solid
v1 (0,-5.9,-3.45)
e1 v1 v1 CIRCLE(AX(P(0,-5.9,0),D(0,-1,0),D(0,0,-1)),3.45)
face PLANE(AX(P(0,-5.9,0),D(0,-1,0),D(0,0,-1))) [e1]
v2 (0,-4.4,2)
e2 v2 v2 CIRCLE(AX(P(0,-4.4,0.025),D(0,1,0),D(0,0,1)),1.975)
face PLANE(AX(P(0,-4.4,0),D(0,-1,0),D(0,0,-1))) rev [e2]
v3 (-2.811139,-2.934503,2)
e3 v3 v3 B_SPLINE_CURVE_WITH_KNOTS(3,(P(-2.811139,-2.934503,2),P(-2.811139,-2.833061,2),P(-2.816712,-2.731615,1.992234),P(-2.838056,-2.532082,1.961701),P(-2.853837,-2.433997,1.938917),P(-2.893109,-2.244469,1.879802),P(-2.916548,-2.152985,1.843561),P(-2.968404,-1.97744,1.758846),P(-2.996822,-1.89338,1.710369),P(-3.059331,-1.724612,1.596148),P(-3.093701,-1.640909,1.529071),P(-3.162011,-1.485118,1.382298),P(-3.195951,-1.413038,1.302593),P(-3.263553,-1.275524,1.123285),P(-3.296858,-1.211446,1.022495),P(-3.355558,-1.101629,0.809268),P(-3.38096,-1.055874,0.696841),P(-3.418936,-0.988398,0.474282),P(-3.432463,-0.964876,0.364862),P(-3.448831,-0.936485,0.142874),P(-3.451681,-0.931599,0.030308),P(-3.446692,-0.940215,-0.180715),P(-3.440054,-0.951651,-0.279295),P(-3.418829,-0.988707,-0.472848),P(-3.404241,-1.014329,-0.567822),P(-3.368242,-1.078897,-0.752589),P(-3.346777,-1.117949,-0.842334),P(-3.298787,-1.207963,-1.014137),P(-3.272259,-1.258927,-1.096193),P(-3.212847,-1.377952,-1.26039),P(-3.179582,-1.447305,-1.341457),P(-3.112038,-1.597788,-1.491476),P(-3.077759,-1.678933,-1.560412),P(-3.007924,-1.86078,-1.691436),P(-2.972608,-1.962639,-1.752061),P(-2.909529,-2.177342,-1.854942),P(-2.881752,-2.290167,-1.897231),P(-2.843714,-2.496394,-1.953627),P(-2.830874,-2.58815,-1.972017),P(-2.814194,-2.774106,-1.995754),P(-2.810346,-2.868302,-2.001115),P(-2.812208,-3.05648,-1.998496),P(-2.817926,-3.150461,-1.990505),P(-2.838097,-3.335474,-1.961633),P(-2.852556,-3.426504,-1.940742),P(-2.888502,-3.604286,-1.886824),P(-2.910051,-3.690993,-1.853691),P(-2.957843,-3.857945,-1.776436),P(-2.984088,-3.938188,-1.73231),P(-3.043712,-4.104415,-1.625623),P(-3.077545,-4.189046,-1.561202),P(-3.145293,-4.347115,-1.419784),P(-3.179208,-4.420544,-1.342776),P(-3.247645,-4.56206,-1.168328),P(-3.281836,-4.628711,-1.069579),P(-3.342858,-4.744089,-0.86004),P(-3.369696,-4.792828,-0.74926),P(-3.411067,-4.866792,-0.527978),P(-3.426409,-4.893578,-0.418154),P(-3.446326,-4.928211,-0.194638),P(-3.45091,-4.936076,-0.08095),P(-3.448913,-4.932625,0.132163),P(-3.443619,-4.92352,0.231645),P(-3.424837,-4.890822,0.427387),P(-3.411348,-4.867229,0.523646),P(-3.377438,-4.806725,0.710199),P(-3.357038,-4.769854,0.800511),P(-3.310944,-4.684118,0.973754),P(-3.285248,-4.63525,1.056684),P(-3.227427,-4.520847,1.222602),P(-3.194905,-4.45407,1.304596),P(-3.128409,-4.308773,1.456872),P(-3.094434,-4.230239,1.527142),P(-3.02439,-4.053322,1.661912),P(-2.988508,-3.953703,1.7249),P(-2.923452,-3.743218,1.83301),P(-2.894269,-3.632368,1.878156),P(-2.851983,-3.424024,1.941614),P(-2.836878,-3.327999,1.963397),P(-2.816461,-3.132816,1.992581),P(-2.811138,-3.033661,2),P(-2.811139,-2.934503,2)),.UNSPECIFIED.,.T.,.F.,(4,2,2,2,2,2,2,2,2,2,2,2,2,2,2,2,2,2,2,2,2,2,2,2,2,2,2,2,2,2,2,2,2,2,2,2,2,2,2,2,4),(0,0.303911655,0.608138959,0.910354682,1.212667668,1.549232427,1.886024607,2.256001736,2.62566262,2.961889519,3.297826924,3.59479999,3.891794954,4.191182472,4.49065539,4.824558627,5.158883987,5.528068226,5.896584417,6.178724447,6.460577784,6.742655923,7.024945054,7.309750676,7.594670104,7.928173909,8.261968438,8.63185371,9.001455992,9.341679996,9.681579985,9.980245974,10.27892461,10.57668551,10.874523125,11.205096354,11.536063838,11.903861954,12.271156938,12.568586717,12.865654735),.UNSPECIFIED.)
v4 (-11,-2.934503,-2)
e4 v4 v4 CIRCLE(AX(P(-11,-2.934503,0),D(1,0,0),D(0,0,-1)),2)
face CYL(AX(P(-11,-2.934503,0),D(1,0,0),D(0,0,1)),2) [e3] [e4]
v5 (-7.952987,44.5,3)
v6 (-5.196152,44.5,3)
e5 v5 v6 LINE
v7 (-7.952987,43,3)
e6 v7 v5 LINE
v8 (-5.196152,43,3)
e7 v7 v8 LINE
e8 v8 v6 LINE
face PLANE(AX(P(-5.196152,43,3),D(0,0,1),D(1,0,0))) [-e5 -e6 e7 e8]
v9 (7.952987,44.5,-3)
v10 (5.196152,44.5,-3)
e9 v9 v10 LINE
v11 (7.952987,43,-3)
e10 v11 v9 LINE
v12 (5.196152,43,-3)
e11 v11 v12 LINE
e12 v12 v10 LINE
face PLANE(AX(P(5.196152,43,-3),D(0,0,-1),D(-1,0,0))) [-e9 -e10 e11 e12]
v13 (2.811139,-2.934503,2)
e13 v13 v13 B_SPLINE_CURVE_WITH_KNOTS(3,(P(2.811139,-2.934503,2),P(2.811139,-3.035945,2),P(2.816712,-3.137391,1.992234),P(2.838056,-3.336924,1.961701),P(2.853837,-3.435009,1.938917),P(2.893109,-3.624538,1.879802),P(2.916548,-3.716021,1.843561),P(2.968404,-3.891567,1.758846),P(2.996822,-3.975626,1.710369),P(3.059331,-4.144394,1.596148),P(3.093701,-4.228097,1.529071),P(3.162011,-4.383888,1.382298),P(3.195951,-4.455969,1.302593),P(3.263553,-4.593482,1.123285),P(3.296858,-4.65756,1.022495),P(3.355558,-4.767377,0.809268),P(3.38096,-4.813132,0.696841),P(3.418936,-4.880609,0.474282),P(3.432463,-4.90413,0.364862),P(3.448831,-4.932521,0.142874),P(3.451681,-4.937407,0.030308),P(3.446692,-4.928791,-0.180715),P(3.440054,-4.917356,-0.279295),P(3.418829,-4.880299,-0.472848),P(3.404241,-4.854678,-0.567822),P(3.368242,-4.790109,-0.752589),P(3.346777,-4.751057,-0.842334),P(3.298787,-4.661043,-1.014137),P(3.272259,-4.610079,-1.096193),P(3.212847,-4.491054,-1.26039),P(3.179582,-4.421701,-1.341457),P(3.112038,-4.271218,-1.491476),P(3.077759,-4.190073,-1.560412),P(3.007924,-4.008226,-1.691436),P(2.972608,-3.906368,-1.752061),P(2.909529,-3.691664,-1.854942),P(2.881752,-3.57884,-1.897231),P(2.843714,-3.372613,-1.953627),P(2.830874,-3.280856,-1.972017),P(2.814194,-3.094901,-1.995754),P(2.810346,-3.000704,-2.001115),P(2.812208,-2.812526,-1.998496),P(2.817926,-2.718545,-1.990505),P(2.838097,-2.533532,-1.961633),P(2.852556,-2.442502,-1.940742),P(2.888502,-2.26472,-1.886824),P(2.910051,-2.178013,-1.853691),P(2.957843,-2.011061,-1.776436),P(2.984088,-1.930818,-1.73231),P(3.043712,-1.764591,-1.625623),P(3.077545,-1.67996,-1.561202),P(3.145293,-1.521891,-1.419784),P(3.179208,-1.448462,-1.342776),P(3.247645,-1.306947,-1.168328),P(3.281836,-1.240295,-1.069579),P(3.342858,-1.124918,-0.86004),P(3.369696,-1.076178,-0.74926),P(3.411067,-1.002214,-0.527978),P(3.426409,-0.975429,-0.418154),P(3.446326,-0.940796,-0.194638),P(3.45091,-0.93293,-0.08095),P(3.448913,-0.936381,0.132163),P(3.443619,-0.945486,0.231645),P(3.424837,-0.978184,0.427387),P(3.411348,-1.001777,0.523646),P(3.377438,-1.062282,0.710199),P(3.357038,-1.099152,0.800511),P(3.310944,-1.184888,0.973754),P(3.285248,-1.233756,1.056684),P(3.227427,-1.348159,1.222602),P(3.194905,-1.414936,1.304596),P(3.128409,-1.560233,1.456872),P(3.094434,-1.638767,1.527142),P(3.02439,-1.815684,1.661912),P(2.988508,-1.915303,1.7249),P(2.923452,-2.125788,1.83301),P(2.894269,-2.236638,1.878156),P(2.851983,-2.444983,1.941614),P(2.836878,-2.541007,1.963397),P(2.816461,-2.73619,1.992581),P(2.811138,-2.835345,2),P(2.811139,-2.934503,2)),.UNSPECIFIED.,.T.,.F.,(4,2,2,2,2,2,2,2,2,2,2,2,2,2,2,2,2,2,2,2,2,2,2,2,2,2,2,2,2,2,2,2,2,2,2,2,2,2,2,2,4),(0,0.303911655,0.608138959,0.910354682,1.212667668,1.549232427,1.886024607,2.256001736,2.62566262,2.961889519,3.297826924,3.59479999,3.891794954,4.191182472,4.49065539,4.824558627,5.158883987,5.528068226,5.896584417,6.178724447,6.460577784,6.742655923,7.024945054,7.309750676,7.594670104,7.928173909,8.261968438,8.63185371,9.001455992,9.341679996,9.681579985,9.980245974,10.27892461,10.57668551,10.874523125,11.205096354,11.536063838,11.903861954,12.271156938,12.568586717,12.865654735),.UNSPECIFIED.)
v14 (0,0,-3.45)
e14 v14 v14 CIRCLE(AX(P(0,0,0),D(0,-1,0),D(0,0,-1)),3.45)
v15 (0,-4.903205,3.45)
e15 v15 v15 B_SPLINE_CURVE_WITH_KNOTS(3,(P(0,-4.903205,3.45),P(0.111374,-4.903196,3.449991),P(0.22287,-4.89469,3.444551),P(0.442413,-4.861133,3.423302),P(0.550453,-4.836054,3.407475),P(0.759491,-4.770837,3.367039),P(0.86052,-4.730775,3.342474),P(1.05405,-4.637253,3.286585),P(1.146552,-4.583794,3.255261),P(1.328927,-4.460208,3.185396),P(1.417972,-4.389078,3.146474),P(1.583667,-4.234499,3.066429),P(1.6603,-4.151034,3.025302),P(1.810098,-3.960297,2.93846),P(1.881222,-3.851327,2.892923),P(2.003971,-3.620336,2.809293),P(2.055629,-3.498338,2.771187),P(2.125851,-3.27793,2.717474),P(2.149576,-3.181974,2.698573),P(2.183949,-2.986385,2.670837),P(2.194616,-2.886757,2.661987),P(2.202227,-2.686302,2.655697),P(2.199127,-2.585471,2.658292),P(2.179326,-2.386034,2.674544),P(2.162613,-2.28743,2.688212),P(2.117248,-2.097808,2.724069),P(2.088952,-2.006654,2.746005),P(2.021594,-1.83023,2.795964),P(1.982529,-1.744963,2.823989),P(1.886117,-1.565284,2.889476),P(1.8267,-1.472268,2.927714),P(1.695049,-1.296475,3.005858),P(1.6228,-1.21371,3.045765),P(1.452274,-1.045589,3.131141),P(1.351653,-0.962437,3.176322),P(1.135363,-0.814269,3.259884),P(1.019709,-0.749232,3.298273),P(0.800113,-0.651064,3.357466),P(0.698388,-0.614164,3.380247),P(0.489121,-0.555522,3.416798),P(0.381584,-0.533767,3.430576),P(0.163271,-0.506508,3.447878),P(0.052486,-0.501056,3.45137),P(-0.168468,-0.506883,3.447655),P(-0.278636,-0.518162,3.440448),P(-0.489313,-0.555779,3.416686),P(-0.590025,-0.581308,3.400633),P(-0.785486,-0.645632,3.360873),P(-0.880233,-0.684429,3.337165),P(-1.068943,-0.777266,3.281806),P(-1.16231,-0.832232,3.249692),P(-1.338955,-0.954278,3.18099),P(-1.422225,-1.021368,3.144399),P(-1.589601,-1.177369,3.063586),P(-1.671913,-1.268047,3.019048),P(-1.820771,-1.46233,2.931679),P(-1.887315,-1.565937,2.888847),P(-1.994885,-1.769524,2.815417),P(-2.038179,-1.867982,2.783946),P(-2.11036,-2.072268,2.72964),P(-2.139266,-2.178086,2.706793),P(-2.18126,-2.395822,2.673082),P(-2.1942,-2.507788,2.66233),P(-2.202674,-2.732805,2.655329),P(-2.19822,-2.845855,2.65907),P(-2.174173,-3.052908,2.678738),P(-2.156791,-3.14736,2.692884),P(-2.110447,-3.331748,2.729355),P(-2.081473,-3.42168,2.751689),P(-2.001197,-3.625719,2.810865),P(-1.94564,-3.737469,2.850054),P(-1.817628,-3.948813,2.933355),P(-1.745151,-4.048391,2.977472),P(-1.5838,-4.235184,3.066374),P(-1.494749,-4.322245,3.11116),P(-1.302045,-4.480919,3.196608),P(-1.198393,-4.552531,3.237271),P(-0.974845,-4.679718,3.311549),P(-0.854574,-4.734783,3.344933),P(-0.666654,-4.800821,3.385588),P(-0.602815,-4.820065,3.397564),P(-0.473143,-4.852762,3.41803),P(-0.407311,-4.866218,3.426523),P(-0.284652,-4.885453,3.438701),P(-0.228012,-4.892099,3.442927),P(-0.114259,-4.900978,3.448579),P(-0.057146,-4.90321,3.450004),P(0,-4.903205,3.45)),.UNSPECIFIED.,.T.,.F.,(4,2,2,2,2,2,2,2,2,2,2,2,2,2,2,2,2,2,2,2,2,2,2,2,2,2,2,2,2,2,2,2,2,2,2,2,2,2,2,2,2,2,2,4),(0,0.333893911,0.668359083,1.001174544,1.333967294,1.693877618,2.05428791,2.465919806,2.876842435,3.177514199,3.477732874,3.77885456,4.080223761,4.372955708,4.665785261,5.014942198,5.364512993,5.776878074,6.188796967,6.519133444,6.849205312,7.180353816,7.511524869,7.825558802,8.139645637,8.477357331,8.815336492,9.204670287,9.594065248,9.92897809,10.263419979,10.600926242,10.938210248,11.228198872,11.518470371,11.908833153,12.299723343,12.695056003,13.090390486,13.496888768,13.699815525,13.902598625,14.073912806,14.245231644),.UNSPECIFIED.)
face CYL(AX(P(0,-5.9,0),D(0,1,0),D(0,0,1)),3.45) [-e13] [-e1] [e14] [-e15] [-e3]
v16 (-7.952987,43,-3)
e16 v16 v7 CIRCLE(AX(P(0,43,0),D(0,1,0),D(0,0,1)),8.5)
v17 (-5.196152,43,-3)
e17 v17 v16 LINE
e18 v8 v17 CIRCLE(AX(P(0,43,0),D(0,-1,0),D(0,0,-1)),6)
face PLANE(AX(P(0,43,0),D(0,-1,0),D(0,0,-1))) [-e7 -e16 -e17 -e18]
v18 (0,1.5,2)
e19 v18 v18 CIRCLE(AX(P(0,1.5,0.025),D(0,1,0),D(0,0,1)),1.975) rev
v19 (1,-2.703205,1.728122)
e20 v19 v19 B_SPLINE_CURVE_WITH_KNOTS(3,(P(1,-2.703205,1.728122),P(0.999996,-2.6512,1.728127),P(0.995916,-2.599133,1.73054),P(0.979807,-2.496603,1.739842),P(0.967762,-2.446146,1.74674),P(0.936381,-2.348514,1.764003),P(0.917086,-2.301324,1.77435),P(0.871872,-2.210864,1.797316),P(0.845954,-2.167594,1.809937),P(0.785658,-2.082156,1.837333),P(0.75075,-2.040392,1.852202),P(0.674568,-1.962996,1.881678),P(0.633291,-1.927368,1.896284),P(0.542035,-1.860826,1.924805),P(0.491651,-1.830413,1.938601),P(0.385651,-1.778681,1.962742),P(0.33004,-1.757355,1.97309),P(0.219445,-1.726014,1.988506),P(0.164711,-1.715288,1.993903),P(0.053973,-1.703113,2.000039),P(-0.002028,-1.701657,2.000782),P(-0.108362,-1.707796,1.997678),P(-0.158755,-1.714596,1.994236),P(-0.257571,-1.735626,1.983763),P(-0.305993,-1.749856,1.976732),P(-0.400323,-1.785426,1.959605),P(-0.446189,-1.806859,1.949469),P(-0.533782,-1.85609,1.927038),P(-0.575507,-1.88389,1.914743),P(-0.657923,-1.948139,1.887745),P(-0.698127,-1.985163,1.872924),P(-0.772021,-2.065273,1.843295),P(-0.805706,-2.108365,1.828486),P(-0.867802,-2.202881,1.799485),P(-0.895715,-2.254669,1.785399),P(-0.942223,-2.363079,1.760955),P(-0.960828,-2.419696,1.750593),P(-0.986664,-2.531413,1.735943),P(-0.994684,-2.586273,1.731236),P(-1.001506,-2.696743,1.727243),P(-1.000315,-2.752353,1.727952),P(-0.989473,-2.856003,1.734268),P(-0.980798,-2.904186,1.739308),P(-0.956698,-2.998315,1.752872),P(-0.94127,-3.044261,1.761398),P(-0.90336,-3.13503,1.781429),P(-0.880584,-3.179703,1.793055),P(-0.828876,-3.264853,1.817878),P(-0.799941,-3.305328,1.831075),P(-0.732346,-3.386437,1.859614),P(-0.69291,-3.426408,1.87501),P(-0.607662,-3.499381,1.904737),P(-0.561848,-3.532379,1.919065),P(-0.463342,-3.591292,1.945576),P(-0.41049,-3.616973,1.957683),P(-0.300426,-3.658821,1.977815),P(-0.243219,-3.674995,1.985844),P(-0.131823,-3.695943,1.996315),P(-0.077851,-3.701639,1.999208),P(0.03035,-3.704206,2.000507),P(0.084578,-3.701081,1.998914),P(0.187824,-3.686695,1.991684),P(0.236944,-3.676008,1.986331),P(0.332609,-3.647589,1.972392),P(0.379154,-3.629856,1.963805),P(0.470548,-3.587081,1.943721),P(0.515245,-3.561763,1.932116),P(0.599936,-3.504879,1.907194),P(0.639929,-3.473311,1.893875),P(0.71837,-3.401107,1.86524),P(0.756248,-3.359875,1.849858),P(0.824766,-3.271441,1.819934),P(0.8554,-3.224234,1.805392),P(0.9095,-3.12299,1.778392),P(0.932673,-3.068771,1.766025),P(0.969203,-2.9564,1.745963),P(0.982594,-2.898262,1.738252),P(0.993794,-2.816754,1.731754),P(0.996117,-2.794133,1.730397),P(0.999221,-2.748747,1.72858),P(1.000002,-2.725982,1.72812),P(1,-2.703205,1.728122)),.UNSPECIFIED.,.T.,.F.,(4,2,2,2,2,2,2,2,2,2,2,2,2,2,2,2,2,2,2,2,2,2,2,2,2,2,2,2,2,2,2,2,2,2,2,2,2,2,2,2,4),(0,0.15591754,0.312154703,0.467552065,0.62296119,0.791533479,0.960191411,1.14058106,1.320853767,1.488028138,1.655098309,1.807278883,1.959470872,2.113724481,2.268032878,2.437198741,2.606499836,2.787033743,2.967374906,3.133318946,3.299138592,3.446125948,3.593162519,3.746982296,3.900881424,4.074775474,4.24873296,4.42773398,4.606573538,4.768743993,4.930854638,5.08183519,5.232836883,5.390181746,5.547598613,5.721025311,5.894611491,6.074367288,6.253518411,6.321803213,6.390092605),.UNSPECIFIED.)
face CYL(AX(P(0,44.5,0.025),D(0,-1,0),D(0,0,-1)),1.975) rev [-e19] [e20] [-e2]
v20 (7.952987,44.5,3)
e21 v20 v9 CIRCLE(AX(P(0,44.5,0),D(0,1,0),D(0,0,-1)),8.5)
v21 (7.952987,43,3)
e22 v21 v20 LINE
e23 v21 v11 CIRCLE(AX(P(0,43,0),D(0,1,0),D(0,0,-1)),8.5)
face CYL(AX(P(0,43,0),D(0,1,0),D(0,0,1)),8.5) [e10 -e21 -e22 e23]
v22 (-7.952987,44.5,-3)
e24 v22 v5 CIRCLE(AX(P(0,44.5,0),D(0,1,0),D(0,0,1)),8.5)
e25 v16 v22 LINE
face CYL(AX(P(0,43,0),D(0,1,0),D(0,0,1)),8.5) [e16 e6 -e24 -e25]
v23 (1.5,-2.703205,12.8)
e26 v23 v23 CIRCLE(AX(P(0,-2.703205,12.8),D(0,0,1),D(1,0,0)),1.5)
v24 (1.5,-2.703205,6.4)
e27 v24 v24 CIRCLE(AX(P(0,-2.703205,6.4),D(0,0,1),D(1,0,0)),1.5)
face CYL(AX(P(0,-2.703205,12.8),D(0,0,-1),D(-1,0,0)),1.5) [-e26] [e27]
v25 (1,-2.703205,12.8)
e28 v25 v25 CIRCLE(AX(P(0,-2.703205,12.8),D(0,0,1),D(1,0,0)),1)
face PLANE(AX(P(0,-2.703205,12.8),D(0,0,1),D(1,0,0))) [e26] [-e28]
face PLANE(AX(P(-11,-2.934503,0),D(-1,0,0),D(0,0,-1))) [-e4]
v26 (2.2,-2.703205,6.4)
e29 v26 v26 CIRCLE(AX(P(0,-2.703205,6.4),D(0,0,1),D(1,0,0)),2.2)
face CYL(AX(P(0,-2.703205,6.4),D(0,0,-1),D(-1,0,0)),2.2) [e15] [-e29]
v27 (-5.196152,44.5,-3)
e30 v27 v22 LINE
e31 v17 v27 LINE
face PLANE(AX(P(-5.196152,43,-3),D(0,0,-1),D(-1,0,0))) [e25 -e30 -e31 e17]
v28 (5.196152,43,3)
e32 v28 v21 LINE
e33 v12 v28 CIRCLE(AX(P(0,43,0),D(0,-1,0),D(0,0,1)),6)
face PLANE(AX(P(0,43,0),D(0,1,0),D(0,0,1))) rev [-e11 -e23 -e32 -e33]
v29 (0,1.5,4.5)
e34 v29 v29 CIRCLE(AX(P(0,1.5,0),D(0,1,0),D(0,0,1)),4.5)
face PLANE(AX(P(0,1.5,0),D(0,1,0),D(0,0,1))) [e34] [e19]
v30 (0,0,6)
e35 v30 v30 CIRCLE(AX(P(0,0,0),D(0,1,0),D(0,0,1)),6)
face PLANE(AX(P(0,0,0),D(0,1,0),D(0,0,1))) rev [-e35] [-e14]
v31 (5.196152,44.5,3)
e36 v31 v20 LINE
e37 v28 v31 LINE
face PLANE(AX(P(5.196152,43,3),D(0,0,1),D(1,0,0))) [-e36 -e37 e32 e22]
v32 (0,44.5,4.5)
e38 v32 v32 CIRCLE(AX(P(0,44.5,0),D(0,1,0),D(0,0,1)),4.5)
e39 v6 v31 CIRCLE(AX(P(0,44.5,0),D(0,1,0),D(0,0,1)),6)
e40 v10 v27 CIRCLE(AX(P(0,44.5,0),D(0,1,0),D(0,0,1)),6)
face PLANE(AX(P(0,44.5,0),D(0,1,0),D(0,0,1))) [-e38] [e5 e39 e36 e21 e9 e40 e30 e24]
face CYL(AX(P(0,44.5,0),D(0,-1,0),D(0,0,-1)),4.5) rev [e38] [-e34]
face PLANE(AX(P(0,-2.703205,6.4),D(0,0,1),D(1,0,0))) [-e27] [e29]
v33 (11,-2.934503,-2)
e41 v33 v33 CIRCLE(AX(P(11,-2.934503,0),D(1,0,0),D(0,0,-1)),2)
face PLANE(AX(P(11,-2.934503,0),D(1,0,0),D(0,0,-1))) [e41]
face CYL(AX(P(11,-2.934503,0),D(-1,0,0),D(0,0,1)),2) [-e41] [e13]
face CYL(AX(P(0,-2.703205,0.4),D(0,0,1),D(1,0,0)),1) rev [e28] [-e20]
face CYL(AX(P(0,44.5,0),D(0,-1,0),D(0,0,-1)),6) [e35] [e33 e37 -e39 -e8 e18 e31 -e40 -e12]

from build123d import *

# Parameters (mm, degrees)
SKETCH1_R           = 6
BOSS_EXTRUDE1_DEPTH = 44.5
SHELL1_T            = -1.5
SKETCH3_R           = 3.45
BOSS_EXTRUDE3_DEPTH = 5.9
SHELL2_START        = -4.4
SHELL2_OUTLINE_R    = 1.95
SHELL2_DEPTH        = 5.9
SKETCH5_R           = 2.2
BOSS_EXTRUDE4_DEPTH = 6.4
SKETCH6_R           = 1.5
BOSS_EXTRUDE5_DEPTH = 6.4
SKETCH7_R           = 1
CUT_EXTRUDE1_DEPTH  = 12.4
SKETCH8_R           = 1.95
CUT_EXTRUDE2_DEPTH  = 51.902357509
SKETCH9_R           = 2
BOSS_EXTRUDE6_DEPTH = 11
SKETCH10_R          = 1.975
CUT_EXTRUDE3_DEPTH  = 52.730551947
SKETCH11_R          = 1
CUT_EXTRUDE4_DEPTH  = 12
BOSS_EXTRUDE8_START = -1.5
BOSS_EXTRUDE8_DEPTH = 1.5


# Read off the part's stored shape, not the designer's step: Shell2
with BuildPart() as part:
    # Sketch1 → Boss-Extrude1 (new body)
    with BuildSketch(Plane(origin=(0, 0, 0), x_dir=(1, 0, 0), z_dir=(0, 1, 0))):
        with Locations(Location((0, 0, 0), (0, 0, 270))):
            Circle(SKETCH1_R)
    extrude(amount=BOSS_EXTRUDE1_DEPTH)

    # Shell1
    shell1_openings = [part.faces().sort_by_distance(p)[0] for p in [
        (0, 44.5, 0),
    ]]
    offset(amount=SHELL1_T, openings=shell1_openings, kind=Kind.INTERSECTION)

    # Sketch3 → Boss-Extrude3 (add)
    with BuildSketch(Plane.XZ):
        with Locations(Location((0, 0, 0), (0, 0, 270))):
            Circle(SKETCH3_R)
    extrude(amount=BOSS_EXTRUDE3_DEPTH)

    # Shell2 outline → Shell2 (cut)
    with BuildSketch(Plane(origin=(0, 0, 0), x_dir=(1, 0, 0), z_dir=(0, 1, 0)).offset(SHELL2_START)):
        Circle(SHELL2_OUTLINE_R)
    extrude(amount=SHELL2_DEPTH, mode=Mode.SUBTRACT)

    # Sketch5 → Boss-Extrude4 (add)
    with BuildSketch(Plane.XY):
        with Locations(Location((0, -2.70320485, 0), (0, 0, 270))):
            Circle(SKETCH5_R)
    extrude(amount=BOSS_EXTRUDE4_DEPTH)

    # Sketch6 → Boss-Extrude5 (add)
    with BuildSketch(Plane.XY.offset(6.4)):
        with Locations((0, -2.70320485)):
            Circle(SKETCH6_R)
    extrude(amount=BOSS_EXTRUDE5_DEPTH)

    # Sketch7 → Cut-Extrude1 (cut)
    with BuildSketch(Plane.XY.offset(12.8)):
        with Locations((0, -2.70320485)):
            Circle(SKETCH7_R)
    extrude(amount=-CUT_EXTRUDE1_DEPTH, mode=Mode.SUBTRACT)

    # Sketch8 → Cut-Extrude2 (cut, through all)
    with BuildSketch(Plane(origin=(0, -4.4, 0), x_dir=(1, 0, 0), z_dir=(0, 1, 0))):
        with Locations(Location((0, 0, 0), (0, 0, 270))):
            Circle(SKETCH8_R)
    extrude(amount=CUT_EXTRUDE2_DEPTH, mode=Mode.SUBTRACT)

    # Sketch9 → Boss-Extrude6 (add)
    with BuildSketch(Plane(origin=(0, 0, 0), x_dir=(0, 0, -1), z_dir=(1, 0, 0))):
        with Locations(Location((0, -2.934503104, 0), (0, 0, 180))):
            Circle(SKETCH9_R)
    extrude(amount=BOSS_EXTRUDE6_DEPTH)

    # Sketch10 → Cut-Extrude3 (cut, through all)
    with BuildSketch(Plane(origin=(0, -4.4, 0), x_dir=(1, 0, 0), z_dir=(0, 1, 0))):
        with Locations(Location((0, -0.025, 0), (0, 0, 270))):
            Circle(SKETCH10_R)
    extrude(amount=CUT_EXTRUDE3_DEPTH, mode=Mode.SUBTRACT)

    # Sketch11 → Cut-Extrude4 (cut)
    with BuildSketch(Plane.XY.offset(12.8)):
        with Locations((0, -2.70320485)):
            Circle(SKETCH11_R)
    extrude(amount=-CUT_EXTRUDE4_DEPTH, mode=Mode.SUBTRACT)

    # Mirror5: part across plane


with BuildPart() as part_1:
    add(part.part)
    add(part.part.mirror(Plane(origin=(0, 0, 0), x_dir=(0, 0, 1), z_dir=(1, 0, 0))))

    # Sketch13 → Boss-Extrude8 (add)
    with BuildSketch(Plane(origin=(0, 44.5, 0), x_dir=(1, 0, 0), z_dir=(0, 1, 0)).offset(BOSS_EXTRUDE8_START)):
        with BuildLine():
            Line((-5.196152423, -3), (-7.95298686, -3))
            ThreePointArc((-7.95298686, -3), (-8.5, 0), (-7.95298686, 3))
            Line((-7.95298686, 3), (-5.196152423, 3))
            ThreePointArc((-5.196152423, 3), (-6, 0), (-5.196152423, -3))
        make_face()
        with BuildLine():
            Line((5.196152423, -3), (7.95298686, -3))
            ThreePointArc((7.95298686, -3), (8.5, 0), (7.95298686, 3))
            Line((7.95298686, 3), (5.196152423, 3))
            ThreePointArc((5.196152423, 3), (6, 0), (5.196152423, -3))
        make_face()
    extrude(amount=BOSS_EXTRUDE8_DEPTH)


solid = part_1.part
